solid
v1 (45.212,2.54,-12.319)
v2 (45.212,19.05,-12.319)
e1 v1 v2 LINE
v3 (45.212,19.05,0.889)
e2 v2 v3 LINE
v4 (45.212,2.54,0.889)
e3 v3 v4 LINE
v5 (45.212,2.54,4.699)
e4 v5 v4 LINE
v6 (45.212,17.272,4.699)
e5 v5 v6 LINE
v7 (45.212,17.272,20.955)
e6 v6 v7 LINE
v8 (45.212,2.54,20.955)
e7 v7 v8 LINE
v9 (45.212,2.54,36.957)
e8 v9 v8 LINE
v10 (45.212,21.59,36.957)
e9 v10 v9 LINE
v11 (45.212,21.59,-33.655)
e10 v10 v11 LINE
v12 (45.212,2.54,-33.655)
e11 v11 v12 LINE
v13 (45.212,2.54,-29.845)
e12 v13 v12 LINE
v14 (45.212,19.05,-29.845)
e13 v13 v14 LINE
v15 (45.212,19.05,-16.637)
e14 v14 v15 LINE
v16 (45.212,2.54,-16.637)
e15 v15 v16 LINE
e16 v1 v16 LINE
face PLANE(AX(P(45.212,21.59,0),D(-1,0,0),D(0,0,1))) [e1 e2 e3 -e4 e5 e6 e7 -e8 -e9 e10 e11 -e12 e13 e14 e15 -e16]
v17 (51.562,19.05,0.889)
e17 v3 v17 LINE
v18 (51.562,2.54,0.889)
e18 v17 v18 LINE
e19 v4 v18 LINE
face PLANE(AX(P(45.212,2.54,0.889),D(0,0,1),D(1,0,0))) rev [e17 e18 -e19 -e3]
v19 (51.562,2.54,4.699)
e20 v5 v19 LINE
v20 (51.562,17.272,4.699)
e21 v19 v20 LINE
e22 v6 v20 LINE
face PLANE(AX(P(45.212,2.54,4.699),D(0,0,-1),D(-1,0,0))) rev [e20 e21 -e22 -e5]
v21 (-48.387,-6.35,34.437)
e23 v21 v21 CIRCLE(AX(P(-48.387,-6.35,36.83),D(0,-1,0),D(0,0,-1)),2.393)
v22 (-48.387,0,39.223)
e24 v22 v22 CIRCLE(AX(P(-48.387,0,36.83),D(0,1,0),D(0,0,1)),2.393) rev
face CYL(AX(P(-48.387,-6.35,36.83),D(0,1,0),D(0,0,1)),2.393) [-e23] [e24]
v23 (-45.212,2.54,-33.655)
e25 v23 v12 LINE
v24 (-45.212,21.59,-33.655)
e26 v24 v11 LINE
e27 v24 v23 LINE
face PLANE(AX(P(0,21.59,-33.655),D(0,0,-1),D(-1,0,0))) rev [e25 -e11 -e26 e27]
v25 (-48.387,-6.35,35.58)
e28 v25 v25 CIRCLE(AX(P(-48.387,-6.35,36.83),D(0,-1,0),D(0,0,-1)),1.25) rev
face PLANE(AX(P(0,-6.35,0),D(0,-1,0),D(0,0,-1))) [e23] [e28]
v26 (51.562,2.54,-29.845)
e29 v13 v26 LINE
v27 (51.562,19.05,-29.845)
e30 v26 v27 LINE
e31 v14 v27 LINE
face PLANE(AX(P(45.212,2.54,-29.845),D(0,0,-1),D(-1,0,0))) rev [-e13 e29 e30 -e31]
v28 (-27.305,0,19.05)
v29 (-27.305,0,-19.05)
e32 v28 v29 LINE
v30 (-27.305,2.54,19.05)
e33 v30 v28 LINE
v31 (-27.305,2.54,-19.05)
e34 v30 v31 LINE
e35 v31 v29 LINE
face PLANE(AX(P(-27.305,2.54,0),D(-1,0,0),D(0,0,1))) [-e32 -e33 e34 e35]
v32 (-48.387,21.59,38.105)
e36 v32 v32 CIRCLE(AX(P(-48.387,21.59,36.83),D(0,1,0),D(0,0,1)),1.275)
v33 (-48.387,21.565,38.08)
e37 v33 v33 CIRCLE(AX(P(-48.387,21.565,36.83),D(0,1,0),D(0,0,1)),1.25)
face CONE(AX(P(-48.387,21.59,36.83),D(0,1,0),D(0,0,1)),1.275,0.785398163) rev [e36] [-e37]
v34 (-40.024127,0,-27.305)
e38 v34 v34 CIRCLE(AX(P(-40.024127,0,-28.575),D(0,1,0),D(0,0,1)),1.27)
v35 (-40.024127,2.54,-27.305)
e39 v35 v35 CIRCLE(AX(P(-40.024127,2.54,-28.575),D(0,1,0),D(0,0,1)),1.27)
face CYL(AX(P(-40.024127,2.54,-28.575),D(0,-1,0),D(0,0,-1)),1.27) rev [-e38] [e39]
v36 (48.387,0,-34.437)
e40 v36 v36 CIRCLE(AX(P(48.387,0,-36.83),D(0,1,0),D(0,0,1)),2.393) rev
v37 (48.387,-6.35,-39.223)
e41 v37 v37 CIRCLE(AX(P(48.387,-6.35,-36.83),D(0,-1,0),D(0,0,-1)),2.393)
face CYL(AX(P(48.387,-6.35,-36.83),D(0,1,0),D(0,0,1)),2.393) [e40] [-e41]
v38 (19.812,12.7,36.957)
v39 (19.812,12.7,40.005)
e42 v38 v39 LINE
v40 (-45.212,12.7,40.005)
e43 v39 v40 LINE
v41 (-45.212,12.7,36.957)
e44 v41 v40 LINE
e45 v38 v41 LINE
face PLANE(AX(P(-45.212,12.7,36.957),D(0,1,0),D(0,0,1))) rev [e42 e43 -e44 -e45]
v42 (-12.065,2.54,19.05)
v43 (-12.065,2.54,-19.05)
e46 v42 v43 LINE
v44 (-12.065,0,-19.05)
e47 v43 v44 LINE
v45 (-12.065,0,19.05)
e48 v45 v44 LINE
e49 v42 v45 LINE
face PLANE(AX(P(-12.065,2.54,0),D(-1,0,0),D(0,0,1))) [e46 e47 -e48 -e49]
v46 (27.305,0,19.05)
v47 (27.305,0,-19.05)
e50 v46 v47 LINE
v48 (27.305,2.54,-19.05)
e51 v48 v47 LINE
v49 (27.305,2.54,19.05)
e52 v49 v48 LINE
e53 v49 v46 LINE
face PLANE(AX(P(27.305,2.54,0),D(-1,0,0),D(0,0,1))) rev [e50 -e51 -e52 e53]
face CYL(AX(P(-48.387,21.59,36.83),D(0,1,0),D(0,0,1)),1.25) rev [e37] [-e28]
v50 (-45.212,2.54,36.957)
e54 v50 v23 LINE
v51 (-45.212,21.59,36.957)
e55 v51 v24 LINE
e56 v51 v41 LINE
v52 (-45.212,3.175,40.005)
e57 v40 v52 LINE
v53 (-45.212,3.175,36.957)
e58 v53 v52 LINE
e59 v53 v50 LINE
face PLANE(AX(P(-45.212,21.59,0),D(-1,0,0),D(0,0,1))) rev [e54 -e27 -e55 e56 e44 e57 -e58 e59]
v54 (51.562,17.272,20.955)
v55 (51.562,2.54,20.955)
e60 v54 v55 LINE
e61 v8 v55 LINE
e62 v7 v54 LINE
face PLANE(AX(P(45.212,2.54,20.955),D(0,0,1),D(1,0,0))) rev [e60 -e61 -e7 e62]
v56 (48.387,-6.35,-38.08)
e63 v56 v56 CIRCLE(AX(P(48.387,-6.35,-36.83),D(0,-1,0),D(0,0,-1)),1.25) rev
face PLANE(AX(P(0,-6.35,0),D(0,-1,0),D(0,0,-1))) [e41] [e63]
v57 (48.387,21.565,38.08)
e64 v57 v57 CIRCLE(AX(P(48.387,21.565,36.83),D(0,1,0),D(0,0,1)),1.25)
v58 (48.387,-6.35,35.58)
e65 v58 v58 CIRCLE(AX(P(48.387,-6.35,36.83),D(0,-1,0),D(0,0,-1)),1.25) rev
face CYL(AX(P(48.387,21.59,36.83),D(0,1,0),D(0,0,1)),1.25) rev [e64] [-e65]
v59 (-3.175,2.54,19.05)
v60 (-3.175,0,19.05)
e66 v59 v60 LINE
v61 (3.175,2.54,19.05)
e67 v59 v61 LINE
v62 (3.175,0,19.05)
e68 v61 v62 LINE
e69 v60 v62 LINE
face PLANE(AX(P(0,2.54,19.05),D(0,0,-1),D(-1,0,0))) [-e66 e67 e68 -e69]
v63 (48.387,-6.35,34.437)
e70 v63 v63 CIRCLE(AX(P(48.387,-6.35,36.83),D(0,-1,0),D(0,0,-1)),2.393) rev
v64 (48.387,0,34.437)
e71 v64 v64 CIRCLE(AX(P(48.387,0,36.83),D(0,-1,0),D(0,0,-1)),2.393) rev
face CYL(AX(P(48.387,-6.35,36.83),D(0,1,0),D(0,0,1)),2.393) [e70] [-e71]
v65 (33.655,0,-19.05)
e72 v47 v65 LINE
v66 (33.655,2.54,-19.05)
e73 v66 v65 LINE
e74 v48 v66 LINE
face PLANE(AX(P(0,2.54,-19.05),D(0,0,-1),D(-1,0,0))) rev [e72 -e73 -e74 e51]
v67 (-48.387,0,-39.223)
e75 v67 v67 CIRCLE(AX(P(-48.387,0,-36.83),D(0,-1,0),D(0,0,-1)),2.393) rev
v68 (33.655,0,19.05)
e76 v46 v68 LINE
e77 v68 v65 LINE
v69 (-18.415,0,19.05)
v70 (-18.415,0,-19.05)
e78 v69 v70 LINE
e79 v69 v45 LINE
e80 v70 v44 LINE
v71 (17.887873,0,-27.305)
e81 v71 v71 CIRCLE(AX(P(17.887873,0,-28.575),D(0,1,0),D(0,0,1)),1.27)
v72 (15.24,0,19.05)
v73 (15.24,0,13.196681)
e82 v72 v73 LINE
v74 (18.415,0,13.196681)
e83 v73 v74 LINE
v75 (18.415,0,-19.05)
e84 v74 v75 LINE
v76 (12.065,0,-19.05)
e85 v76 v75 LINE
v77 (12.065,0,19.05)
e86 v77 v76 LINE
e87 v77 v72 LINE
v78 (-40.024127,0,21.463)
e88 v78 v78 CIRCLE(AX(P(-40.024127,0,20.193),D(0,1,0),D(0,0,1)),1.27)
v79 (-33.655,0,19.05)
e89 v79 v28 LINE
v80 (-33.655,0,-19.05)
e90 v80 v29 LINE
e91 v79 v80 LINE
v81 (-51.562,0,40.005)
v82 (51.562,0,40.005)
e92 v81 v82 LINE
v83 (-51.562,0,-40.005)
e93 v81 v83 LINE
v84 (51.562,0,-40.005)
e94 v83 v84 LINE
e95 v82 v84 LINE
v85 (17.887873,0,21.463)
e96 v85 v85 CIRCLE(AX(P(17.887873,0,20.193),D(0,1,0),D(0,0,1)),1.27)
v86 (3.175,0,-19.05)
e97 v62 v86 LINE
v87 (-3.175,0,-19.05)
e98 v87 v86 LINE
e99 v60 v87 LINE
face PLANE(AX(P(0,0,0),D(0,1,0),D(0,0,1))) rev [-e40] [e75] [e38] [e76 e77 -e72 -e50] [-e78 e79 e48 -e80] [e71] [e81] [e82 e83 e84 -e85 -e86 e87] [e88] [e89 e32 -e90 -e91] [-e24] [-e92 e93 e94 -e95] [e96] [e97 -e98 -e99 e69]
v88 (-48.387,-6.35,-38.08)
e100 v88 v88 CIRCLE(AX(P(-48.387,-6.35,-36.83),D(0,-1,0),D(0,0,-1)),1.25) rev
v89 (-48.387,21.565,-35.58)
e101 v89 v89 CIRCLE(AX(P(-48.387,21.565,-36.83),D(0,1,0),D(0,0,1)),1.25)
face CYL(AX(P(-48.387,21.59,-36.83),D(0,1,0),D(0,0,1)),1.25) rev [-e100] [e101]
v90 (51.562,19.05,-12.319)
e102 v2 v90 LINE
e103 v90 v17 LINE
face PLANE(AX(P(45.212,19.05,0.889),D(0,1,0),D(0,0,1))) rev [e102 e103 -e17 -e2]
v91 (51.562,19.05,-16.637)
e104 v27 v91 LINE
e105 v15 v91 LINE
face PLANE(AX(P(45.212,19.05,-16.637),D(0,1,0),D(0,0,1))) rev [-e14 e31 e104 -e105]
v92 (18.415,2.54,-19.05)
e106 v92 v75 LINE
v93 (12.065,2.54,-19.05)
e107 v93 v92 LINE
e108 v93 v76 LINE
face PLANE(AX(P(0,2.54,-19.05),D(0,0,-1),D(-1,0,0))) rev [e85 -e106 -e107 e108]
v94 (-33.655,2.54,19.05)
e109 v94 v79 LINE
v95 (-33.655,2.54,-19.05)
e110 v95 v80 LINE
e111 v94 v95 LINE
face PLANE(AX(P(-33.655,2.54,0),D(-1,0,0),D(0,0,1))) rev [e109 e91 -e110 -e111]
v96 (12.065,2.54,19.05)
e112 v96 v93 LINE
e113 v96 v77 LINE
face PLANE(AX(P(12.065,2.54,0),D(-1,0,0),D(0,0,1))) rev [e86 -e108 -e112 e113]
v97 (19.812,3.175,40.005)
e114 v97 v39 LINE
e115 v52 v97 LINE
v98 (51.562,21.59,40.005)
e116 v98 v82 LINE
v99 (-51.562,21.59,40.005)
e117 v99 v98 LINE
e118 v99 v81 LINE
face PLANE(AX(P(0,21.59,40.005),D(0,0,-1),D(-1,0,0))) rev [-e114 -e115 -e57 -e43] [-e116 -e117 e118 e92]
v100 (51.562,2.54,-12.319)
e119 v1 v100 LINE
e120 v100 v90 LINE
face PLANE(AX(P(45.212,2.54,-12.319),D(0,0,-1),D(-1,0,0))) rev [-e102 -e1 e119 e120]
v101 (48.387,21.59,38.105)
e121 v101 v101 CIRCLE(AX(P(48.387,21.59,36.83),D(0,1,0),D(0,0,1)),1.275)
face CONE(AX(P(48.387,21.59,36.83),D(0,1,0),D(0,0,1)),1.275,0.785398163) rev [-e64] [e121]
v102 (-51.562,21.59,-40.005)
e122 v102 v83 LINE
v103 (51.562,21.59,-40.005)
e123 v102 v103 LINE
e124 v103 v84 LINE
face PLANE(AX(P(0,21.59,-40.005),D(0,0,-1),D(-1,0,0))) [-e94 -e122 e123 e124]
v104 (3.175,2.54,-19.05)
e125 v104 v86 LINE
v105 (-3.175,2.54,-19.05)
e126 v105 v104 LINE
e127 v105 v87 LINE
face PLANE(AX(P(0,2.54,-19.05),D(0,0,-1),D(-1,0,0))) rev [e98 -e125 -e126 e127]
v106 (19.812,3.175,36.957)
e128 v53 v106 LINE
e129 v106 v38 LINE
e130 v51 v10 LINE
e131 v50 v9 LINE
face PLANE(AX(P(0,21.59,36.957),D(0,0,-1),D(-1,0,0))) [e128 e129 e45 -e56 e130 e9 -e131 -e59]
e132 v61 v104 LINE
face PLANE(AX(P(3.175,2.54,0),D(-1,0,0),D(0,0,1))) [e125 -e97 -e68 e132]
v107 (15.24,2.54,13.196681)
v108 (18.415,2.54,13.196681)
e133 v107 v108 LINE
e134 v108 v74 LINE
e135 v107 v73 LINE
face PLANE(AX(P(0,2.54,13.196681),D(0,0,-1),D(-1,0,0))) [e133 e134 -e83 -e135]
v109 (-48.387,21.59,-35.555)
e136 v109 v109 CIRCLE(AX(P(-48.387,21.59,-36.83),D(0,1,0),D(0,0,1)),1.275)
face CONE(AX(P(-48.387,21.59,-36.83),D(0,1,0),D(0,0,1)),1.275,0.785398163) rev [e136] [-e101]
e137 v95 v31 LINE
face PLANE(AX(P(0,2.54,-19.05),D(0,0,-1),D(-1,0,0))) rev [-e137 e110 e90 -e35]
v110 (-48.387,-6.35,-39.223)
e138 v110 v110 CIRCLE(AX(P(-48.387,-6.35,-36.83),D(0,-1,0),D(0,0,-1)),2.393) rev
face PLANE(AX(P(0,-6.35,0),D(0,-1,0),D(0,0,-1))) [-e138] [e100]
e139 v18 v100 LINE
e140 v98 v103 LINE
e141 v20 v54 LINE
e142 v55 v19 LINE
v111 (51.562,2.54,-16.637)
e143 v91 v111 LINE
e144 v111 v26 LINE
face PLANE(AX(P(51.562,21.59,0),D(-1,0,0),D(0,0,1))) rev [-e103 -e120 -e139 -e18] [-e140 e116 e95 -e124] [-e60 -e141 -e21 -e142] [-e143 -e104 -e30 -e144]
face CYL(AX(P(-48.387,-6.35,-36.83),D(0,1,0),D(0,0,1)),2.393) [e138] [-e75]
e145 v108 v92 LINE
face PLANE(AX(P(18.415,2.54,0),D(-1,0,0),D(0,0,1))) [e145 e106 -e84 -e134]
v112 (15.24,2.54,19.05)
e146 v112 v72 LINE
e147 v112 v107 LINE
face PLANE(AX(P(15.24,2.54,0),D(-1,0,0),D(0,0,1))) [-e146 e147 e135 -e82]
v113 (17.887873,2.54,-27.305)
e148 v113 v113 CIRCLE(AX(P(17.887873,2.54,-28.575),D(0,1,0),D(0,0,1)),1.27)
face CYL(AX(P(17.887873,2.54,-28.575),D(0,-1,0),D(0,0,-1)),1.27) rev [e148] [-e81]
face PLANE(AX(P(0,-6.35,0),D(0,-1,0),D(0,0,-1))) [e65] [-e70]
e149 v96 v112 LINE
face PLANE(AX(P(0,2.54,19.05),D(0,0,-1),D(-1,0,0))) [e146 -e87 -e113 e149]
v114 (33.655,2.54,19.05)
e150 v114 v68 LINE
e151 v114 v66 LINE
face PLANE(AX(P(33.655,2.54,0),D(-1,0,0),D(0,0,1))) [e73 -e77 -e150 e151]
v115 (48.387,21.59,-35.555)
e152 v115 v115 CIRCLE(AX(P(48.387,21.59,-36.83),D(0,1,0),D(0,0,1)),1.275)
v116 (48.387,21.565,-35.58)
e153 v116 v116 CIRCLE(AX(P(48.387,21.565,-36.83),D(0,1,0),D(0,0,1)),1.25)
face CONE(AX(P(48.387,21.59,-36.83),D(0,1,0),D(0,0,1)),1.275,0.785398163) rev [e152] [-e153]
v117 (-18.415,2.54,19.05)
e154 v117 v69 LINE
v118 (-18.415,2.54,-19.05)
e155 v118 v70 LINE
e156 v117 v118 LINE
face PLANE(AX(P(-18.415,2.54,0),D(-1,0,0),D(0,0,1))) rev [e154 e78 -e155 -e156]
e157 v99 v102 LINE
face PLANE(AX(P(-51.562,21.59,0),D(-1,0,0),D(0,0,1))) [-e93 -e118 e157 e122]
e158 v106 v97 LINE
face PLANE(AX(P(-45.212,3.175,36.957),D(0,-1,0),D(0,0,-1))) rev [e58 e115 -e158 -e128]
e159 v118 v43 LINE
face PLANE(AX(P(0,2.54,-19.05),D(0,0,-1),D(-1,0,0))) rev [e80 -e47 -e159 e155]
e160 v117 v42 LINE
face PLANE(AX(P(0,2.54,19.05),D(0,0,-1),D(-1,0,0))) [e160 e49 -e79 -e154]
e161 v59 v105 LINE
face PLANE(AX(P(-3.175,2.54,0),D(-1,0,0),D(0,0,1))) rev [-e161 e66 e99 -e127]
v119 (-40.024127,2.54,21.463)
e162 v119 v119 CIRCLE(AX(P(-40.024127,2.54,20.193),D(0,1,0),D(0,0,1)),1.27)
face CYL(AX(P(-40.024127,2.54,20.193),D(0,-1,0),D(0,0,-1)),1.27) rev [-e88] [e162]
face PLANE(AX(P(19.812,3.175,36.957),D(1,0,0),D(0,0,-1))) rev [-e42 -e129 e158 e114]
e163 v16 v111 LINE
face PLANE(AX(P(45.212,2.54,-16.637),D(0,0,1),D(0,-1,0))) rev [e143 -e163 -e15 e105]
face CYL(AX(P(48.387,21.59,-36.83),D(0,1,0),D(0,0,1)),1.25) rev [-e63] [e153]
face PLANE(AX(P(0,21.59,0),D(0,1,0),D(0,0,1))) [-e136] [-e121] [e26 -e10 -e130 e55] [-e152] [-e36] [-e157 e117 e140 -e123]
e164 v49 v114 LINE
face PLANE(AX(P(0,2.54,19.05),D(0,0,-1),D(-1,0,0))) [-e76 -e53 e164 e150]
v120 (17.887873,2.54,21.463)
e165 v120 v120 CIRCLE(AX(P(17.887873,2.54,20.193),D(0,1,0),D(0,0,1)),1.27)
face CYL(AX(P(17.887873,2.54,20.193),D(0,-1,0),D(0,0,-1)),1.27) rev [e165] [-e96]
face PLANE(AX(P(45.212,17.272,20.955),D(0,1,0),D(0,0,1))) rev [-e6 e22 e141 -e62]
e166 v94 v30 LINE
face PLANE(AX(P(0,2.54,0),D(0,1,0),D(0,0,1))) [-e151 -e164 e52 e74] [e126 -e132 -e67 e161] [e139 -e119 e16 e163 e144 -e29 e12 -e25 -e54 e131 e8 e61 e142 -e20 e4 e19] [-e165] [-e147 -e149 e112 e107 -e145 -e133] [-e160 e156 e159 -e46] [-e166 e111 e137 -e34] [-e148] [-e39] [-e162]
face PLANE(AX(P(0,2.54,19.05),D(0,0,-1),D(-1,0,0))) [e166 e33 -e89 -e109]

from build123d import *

# Parameters (mm, degrees)
SKETCH1_W           = 103.124
SKETCH1_H           = 80.01
SKETCH1_W_2         = 90.424
SKETCH1_H_2         = 70.612
BOSS_EXTRUDE3_DEPTH = 21.59
SKETCH1_4_W         = 90.424
SKETCH1_4_H         = 70.612
SKETCH1_4_R         = 1.27
SKETCH1_4_W_2       = 6.35
SKETCH1_4_H_2       = 38.1
BOSS_EXTRUDE4_DEPTH = 2.54
SKETCH2_W           = 16.256
SKETCH2_H           = 14.732
SKETCH2_W_2         = 13.208
SKETCH2_H_2         = 16.51
CUT_EXTRUDE1_DEPTH  = 6.35
SKETCH6_W           = 65.024
SKETCH6_H           = 9.525
CUT_EXTRUDE2_DEPTH  = 3.048
SKETCH8_R           = 2.393
SKETCH8_R_2         = 1.25
BOSS_EXTRUDE5_DEPTH = 6.35


# Read off the part's stored shape, not the designer's step: Ø2.5mm Dowel Hole1
with BuildPart() as part:
    # Sketch1 → Boss-Extrude3 (new body)
    with BuildSketch(Plane(origin=(0, 0, 0), x_dir=(1, 0, 0), z_dir=(0, 1, 0))):
        Rectangle(SKETCH1_W, SKETCH1_H)
        with Locations((0, -1.651)):
            Rectangle(SKETCH1_W_2, SKETCH1_H_2, mode=Mode.SUBTRACT)
    extrude(amount=BOSS_EXTRUDE3_DEPTH)

    # Sketch1<4> → Boss-Extrude4 (add)
    with BuildSketch(Plane(origin=(0, 0, 0), x_dir=(1, 0, 0), z_dir=(0, 1, 0))):
        with Locations((0, -1.651)):
            Rectangle(SKETCH1_4_W, SKETCH1_4_H)
        with Locations(Location((-40.024126951, -20.193, 0), (0, 0, 270))):
            Circle(SKETCH1_4_R, mode=Mode.SUBTRACT)
        with Locations((-30.48, 0)):
            Rectangle(SKETCH1_4_W_2, SKETCH1_4_H_2, mode=Mode.SUBTRACT)
        with Locations((-15.24, 0)):
            Rectangle(SKETCH1_4_W_2, SKETCH1_4_H_2, mode=Mode.SUBTRACT)
        Rectangle(SKETCH1_4_W_2, SKETCH1_4_H_2, mode=Mode.SUBTRACT)
        with BuildLine():
            ThreePointArc((18.415, -19.037561911), (18.956131264, -19.506178054), (19.157873049, -20.193))
            ThreePointArc((19.157873049, -20.193), (16.819614834, -20.879821946), (18.415, -19.037561911))
        make_face(mode=Mode.SUBTRACT)
        Polygon((12.065, -19.05), (12.065, 19.05), (18.415, 19.05), (18.415, -13.196681286), (15.24, -13.196681286), (15.24, -19.05), align=None, mode=Mode.SUBTRACT)
        with Locations((30.48, 0)):
            Rectangle(SKETCH1_4_W_2, SKETCH1_4_H_2, mode=Mode.SUBTRACT)
        with Locations(Location((-40.024126951, 28.575, 0), (0, 0, 270))):
            Circle(SKETCH1_4_R, mode=Mode.SUBTRACT)
        with Locations(Location((17.887873049, 28.575, 0), (0, 0, 270))):
            Circle(SKETCH1_4_R, mode=Mode.SUBTRACT)
    extrude(amount=BOSS_EXTRUDE4_DEPTH)

    # Sketch2 → Cut-Extrude1 (cut)
    with BuildSketch(Plane(origin=(51.562, 0, 0), x_dir=(0, 0, -1), z_dir=(1, 0, 0))):
        with Locations((-12.827, 9.906)):
            Rectangle(SKETCH2_W, SKETCH2_H)
        with Locations((5.715, 10.795)):
            Rectangle(SKETCH2_W_2, SKETCH2_H_2)
        with Locations((23.241, 10.795)):
            Rectangle(SKETCH2_W_2, SKETCH2_H_2)
    extrude(amount=-CUT_EXTRUDE1_DEPTH, mode=Mode.SUBTRACT)

    # Ø2.5mm Dowel Hole1 outline → Ø2.5mm Dowel Hole1 (revolve, cut)
    with BuildSketch(Plane(origin=(48.387, 0, -36.83), x_dir=(1, 0, 0), z_dir=(0, 0, 1))):
        Polygon((0, 0), (1.25, 0), (1.25, 21.565), (1.275, 21.59), (0, 21.59), align=None)
    revolve(axis=Axis((48.387, 0, -36.83), (0, 1, 0)), mode=Mode.SUBTRACT)

    # 2.5mm Dowel Hole1 2 outline → 2.5mm Dowel Hole1 2 (revolve, cut)
    with BuildSketch(Plane(origin=(48.387, 0, 36.83), x_dir=(1, 0, 0), z_dir=(0, 0, 1))):
        Polygon((0, 0), (1.25, 0), (1.25, 21.565), (1.275, 21.59), (0, 21.59), align=None)
    revolve(axis=Axis((48.387, 0, 36.83), (0, 1, 0)), mode=Mode.SUBTRACT)

    # 2.5mm Dowel Hole1 3 outline → 2.5mm Dowel Hole1 3 (revolve, cut)
    with BuildSketch(Plane(origin=(-48.387, 0, -36.83), x_dir=(1, 0, 0), z_dir=(0, 0, 1))):
        Polygon((0, 0), (1.25, 0), (1.25, 21.565), (1.275, 21.59), (0, 21.59), align=None)
    revolve(axis=Axis((-48.387, 0, -36.83), (0, 1, 0)), mode=Mode.SUBTRACT)

    # 2.5mm Dowel Hole1 4 outline → 2.5mm Dowel Hole1 4 (revolve, cut)
    with BuildSketch(Plane(origin=(-48.387, 0, 36.83), x_dir=(1, 0, 0), z_dir=(0, 0, 1))):
        Polygon((0, 0), (1.25, 0), (1.25, 21.565), (1.275, 21.59), (0, 21.59), align=None)
    revolve(axis=Axis((-48.387, 0, 36.83), (0, 1, 0)), mode=Mode.SUBTRACT)

    # Sketch6 → Cut-Extrude2 (cut)
    with BuildSketch(Plane.XY.offset(40.005)):
        with Locations((-12.7, 7.9375)):
            Rectangle(SKETCH6_W, SKETCH6_H)
    extrude(amount=-CUT_EXTRUDE2_DEPTH, mode=Mode.SUBTRACT)

    # Sketch8 → Boss-Extrude5 (add)
    # profile 1 of 4: a face of its own
    with BuildSketch(Plane.XZ):
        with Locations(Location((-48.387, 36.83, 0), (0, 0, 90))):
            Circle(SKETCH8_R)
        with Locations(Location((-48.387, 36.83, 0), (0, 0, 90))):
            Circle(SKETCH8_R_2, mode=Mode.SUBTRACT)
    # profile 2 of 4: a face of its own
    with BuildSketch(Plane.XZ):
        with Locations(Location((48.387, 36.83, 0), (0, 0, 270))):
            Circle(SKETCH8_R)
        with Locations(Location((48.387, 36.83, 0), (0, 0, 90))):
            Circle(SKETCH8_R_2, mode=Mode.SUBTRACT)
    # profile 3 of 4: a face of its own
    with BuildSketch(Plane.XZ):
        with Locations(Location((48.387, -36.83, 0), (0, 0, 90))):
            Circle(SKETCH8_R)
        with Locations(Location((48.387, -36.83, 0), (0, 0, 90))):
            Circle(SKETCH8_R_2, mode=Mode.SUBTRACT)
    # profile 4 of 4: a face of its own
    with BuildSketch(Plane.XZ):
        with Locations(Location((-48.387, -36.83, 0), (0, 0, 270))):
            Circle(SKETCH8_R)
        with Locations(Location((-48.387, -36.83, 0), (0, 0, 90))):
            Circle(SKETCH8_R_2, mode=Mode.SUBTRACT)
    extrude(amount=BOSS_EXTRUDE5_DEPTH)


solid = part.part
